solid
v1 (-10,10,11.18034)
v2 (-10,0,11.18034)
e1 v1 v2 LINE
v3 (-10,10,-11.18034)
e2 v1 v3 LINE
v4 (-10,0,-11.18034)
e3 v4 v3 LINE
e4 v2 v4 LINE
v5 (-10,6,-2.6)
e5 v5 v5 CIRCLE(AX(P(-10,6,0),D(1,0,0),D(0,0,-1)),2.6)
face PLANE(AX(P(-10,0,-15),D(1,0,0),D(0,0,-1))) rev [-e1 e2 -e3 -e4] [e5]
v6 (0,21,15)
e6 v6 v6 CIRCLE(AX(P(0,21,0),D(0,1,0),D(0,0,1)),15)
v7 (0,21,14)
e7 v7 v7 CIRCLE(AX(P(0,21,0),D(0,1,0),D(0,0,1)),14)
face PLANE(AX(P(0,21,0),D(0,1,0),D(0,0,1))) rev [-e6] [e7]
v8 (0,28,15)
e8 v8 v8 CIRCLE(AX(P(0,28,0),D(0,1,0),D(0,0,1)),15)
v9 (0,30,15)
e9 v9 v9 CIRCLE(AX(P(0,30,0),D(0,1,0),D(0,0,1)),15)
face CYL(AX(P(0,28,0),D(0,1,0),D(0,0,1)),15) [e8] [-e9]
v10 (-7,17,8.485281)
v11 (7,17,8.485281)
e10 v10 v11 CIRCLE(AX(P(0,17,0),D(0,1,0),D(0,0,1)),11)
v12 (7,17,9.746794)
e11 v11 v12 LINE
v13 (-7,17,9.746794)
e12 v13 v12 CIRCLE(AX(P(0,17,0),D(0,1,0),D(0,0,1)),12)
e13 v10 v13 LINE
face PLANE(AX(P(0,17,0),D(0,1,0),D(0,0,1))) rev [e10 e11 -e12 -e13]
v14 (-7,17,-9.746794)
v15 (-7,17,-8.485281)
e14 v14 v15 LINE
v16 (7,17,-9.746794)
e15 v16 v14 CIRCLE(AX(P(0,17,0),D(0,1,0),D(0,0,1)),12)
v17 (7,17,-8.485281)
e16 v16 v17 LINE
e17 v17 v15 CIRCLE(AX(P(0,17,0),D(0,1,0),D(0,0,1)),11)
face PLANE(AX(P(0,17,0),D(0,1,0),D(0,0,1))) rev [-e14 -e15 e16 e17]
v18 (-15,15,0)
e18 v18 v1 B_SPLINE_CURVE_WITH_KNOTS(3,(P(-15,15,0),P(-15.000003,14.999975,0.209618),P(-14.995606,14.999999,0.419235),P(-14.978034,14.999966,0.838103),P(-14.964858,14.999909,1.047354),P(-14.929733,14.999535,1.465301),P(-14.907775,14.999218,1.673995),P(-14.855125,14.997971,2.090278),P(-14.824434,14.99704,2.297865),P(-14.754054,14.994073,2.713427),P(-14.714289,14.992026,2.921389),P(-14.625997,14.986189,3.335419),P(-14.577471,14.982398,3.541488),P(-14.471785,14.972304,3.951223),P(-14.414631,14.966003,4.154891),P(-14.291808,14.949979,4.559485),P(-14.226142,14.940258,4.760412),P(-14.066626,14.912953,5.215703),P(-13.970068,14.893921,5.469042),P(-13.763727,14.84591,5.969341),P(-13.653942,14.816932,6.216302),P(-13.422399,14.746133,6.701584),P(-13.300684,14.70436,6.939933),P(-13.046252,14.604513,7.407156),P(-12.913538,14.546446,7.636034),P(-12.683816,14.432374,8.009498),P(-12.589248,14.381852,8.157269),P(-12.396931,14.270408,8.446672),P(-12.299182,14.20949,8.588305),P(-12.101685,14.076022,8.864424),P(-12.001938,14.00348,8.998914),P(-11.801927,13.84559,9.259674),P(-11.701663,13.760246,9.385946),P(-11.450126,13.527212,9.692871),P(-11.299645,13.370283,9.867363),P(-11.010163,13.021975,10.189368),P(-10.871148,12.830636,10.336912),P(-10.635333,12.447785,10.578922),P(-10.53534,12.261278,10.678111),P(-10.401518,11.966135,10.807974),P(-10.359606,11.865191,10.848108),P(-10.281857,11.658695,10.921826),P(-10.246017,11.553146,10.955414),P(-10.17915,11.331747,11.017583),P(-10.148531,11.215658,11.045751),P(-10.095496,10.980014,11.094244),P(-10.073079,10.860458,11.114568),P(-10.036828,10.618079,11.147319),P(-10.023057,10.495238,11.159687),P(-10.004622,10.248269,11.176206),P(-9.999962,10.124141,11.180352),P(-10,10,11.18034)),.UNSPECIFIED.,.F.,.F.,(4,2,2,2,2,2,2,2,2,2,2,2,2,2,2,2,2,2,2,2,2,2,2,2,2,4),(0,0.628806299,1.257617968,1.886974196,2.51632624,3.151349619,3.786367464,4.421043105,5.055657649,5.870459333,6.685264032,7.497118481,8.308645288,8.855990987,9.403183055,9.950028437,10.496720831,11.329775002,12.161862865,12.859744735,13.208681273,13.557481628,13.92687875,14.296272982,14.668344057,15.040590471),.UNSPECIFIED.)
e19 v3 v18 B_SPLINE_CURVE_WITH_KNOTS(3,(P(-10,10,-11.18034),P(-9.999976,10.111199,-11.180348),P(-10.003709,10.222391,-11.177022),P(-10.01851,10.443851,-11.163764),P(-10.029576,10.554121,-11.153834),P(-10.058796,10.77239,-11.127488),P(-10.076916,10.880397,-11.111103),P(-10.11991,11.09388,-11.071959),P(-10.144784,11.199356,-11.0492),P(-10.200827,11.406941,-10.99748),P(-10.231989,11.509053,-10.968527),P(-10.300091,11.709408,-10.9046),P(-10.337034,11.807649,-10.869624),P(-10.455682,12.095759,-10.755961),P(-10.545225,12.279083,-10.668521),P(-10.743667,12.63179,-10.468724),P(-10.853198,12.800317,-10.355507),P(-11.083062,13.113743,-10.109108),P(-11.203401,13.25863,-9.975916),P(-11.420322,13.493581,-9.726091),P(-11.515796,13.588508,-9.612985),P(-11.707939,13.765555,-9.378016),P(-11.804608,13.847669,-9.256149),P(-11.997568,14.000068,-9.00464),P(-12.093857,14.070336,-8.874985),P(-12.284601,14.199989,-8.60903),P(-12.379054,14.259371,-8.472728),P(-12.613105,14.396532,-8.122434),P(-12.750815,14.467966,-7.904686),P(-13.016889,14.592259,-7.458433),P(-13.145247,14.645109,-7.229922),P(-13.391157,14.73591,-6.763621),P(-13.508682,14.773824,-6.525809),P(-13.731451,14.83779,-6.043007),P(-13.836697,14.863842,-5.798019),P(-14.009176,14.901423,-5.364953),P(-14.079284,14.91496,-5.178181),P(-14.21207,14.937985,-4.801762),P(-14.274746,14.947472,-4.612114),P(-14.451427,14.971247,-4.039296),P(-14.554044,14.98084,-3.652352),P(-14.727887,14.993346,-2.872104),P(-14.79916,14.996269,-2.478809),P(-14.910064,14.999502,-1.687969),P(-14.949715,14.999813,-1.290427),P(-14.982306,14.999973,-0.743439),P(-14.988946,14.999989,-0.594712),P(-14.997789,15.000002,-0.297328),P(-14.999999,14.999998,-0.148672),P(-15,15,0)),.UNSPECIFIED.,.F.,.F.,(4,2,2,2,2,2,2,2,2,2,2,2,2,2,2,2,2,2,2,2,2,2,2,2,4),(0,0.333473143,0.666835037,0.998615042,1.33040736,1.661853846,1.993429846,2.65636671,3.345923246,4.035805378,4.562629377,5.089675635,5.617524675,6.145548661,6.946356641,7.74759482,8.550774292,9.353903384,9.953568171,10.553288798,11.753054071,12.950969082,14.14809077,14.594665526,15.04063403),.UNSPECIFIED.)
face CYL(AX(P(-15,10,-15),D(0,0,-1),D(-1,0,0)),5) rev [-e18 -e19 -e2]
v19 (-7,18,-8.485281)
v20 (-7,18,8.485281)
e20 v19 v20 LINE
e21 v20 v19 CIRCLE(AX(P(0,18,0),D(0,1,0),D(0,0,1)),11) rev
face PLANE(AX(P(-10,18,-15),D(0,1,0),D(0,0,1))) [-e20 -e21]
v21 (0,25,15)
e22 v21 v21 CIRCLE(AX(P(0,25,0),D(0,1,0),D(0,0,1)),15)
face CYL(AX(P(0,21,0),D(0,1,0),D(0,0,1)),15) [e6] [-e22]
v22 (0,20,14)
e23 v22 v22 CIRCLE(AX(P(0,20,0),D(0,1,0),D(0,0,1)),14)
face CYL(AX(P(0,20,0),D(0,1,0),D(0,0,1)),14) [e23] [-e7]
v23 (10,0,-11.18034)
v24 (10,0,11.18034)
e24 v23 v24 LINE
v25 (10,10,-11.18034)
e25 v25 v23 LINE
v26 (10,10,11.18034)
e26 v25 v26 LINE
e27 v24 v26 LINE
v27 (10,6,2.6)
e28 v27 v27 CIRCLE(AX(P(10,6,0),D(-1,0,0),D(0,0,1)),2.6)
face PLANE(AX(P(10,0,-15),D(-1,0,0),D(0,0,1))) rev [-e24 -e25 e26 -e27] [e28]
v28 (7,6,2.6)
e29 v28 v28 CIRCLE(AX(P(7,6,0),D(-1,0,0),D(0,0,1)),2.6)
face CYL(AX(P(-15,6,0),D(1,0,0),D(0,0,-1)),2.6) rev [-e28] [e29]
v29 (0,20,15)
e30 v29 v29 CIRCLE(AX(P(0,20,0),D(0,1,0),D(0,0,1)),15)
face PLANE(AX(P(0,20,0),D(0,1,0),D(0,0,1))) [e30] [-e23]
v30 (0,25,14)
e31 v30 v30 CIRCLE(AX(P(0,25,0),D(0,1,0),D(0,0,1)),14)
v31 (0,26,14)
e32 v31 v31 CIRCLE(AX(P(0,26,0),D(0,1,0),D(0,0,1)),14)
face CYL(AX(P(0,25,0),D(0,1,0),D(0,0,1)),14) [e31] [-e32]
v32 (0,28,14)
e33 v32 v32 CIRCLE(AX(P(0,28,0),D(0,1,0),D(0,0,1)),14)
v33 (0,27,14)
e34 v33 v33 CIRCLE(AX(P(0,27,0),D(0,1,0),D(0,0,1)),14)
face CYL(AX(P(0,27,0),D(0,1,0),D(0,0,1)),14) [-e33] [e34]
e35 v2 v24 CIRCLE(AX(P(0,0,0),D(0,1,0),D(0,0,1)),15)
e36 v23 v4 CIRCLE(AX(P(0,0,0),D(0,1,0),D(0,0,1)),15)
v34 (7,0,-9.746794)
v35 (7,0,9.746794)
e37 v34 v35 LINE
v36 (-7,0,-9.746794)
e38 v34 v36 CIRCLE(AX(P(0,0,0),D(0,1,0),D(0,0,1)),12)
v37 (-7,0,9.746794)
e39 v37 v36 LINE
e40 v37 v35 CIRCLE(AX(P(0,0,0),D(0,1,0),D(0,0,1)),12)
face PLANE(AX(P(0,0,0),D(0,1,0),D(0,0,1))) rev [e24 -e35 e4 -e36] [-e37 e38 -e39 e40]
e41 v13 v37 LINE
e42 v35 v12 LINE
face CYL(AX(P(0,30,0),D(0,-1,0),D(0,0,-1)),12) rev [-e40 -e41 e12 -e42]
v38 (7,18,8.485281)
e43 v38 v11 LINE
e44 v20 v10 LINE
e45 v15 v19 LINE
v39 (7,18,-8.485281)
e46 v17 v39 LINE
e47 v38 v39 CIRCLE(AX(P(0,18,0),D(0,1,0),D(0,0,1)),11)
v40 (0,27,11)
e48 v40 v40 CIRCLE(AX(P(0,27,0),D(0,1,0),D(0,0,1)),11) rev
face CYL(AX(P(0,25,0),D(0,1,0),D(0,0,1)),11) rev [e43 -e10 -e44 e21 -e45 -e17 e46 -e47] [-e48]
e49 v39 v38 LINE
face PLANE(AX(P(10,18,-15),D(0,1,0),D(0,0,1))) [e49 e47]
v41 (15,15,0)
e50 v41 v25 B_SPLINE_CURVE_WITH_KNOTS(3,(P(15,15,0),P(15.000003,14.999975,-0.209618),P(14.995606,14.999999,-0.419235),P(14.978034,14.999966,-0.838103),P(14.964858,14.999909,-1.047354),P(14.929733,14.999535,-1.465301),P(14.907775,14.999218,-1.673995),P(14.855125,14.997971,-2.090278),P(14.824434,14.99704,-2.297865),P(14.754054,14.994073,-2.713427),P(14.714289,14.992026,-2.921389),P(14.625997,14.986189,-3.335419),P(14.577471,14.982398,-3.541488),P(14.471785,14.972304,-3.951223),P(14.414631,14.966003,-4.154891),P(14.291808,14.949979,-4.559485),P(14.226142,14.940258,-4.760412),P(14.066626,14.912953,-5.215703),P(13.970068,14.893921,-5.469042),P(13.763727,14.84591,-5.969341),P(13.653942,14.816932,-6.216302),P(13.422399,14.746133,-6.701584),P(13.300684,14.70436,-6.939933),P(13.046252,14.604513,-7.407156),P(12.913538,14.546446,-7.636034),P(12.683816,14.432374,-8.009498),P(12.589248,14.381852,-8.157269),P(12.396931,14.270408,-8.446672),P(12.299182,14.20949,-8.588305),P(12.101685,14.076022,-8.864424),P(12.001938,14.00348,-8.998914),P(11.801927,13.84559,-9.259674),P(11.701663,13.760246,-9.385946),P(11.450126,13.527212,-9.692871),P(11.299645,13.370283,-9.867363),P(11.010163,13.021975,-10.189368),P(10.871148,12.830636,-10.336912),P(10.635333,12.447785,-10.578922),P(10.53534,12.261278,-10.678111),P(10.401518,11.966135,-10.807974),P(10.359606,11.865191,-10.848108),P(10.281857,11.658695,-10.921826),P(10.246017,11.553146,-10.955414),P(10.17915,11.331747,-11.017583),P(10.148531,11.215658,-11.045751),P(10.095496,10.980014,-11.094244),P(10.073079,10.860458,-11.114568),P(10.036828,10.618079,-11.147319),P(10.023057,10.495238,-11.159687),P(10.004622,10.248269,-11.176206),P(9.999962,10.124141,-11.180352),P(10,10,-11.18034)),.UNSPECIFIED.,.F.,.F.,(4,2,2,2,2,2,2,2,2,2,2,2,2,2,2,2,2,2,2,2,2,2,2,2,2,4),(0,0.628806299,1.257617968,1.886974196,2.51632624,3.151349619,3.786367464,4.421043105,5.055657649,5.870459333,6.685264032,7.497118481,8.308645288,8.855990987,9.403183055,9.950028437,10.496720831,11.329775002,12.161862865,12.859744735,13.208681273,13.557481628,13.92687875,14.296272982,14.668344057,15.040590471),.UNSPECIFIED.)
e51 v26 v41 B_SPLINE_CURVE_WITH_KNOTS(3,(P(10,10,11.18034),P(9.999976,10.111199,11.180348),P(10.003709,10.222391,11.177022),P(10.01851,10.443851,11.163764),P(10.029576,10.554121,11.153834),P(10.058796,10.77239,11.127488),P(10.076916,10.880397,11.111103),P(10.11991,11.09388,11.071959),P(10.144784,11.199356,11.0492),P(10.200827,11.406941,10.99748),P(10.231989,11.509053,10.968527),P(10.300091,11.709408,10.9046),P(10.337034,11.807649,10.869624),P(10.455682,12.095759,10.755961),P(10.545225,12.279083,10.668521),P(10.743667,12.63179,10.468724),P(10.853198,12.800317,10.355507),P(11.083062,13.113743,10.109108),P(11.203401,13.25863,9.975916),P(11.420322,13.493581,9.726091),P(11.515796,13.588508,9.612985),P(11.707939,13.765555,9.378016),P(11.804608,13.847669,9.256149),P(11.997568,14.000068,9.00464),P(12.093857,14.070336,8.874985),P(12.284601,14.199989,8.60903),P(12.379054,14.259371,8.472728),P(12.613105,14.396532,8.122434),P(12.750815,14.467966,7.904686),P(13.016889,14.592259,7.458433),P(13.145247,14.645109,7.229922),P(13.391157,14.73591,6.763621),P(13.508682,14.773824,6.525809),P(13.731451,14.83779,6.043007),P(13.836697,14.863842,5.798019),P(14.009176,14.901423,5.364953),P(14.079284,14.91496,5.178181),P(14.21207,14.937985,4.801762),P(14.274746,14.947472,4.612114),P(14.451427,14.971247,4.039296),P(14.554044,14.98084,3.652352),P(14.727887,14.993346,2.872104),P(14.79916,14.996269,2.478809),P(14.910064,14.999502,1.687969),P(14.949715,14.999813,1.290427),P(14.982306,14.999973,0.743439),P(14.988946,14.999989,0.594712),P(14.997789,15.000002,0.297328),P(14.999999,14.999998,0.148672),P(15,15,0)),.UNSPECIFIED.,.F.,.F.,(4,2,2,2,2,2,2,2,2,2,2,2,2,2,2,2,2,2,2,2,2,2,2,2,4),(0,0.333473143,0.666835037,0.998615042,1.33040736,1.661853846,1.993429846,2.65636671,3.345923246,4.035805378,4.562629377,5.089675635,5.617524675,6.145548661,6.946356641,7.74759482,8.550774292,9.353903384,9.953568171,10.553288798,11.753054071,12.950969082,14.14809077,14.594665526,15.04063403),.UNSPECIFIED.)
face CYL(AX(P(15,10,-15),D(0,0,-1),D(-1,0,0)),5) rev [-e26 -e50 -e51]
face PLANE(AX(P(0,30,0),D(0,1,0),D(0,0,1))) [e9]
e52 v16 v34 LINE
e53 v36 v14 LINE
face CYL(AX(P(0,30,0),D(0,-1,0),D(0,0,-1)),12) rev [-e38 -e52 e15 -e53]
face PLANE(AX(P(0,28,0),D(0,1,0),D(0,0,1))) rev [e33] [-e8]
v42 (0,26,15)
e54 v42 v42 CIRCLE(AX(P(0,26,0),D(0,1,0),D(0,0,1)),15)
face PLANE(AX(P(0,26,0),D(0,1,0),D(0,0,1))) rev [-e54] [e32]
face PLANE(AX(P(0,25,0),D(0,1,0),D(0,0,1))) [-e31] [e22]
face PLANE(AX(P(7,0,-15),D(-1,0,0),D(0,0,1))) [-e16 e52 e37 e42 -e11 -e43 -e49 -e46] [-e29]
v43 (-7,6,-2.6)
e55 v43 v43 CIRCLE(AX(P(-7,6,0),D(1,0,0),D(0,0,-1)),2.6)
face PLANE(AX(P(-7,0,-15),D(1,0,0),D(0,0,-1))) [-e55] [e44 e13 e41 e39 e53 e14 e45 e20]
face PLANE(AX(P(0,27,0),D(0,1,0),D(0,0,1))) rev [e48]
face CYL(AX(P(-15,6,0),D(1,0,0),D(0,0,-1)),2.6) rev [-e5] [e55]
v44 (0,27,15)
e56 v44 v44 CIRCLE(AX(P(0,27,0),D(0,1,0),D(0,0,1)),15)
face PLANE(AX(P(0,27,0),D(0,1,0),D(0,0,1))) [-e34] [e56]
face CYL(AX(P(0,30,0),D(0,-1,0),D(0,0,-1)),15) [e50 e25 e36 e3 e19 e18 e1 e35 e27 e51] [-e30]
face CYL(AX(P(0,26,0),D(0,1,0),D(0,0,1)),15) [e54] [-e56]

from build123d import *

# Parameters (mm, degrees)
SKETCH1_R               = 15
BOSS_EXTRUDE1_DEPTH     = 30
CUT_EXTRUDE3_DEPTH      = 37.742346142
CUT_EXTRUDE3_DEPTH_BACK = 37.742346142
SKETCH5_W               = 5
SKETCH5_H               = 15
CUT_EXTRUDE5_START      = -10
SKETCH6_R               = 15
CUT_EXTRUDE5_DEPTH      = 10
SKETCH6_4_R             = 14
BOSS_EXTRUDE2_DEPTH     = 10
SKETCH6_5_R             = 15
SKETCH6_5_R_2           = 14
BOSS_EXTRUDE3_DEPTH     = 9
SKETCH6_6_R             = 15
SKETCH6_6_R_2           = 14
CUT_EXTRUDE6_DEPTH      = 5
SKETCH6_7_R             = 15
SKETCH6_7_R_2           = 14
BOSS_EXTRUDE4_DEPTH     = 4
SKETCH6_8_R             = 15
SKETCH6_8_R_2           = 14
CUT_EXTRUDE7_DEPTH      = 3
SKETCH6_9_R             = 15
SKETCH6_9_R_2           = 14
BOSS_EXTRUDE5_DEPTH     = 2
SHELL2_DEPTH            = 27
SHELL2_START            = 18
SHELL2_2_DEPTH          = 9
SHELL2_3_DEPTH          = 17
CUT_EXTRUDE2_DEPTH      = 37.742346142
CUT_EXTRUDE2_DEPTH_BACK = 37.742346142
SKETCH4_R               = 2.6
FILLET1_R               = 5


# Read off the part's stored shape, not the designer's step: Shell2
with BuildPart() as part:
    # Sketch1 → Boss-Extrude1 (new body)
    with BuildSketch(Plane(origin=(0, 0, 0), x_dir=(1, 0, 0), z_dir=(0, 1, 0))):
        with Locations(Location((0, 0, 0), (0, 0, 270))):
            Circle(SKETCH1_R)
    extrude(amount=BOSS_EXTRUDE1_DEPTH)

    # Sketch5 → Cut-Extrude3 (cut, two sides: drawn at the far end of the back side and taken through both)
    with BuildSketch(Plane.XY.offset(-CUT_EXTRUDE3_DEPTH_BACK)):
        with Locations((-12.5, 7.5)):
            Rectangle(SKETCH5_W, SKETCH5_H)
        with Locations((12.5, 7.5)):
            Rectangle(SKETCH5_W, SKETCH5_H)
    extrude(amount=CUT_EXTRUDE3_DEPTH + CUT_EXTRUDE3_DEPTH_BACK, mode=Mode.SUBTRACT)

    # Sketch6 → Cut-Extrude5 (cut)
    with BuildSketch(Plane(origin=(0, 30, 0), x_dir=(1, 0, 0), z_dir=(0, 1, 0)).offset(CUT_EXTRUDE5_START)):
        with Locations(Location((0, 0, 0), (0, 0, 48.189685104))):
            Circle(SKETCH6_R)
    extrude(amount=CUT_EXTRUDE5_DEPTH, mode=Mode.SUBTRACT)

    # Sketch6<4> → Boss-Extrude2 (add)
    with BuildSketch(Plane(origin=(0, 30, 0), x_dir=(1, 0, 0), z_dir=(0, 1, 0))):
        with Locations(Location((0, 0, 0), (0, 0, 270))):
            Circle(SKETCH6_4_R)
    extrude(amount=-BOSS_EXTRUDE2_DEPTH)

    # Sketch6<5> → Boss-Extrude3 (add)
    with BuildSketch(Plane(origin=(0, 30, 0), x_dir=(1, 0, 0), z_dir=(0, 1, 0))):
        with Locations(Location((0, 0, 0), (0, 0, 48.189685104))):
            Circle(SKETCH6_5_R)
        with Locations(Location((0, 0, 0), (0, 0, 270))):
            Circle(SKETCH6_5_R_2, mode=Mode.SUBTRACT)
    extrude(amount=-BOSS_EXTRUDE3_DEPTH)

    # Sketch6<6> → Cut-Extrude6 (cut)
    with BuildSketch(Plane(origin=(0, 30, 0), x_dir=(1, 0, 0), z_dir=(0, 1, 0))):
        with Locations(Location((0, 0, 0), (0, 0, 270))):
            Circle(SKETCH6_6_R)
        with Locations(Location((0, 0, 0), (0, 0, 270))):
            Circle(SKETCH6_6_R_2, mode=Mode.SUBTRACT)
    extrude(amount=-CUT_EXTRUDE6_DEPTH, mode=Mode.SUBTRACT)

    # Sketch6<7> → Boss-Extrude4 (add)
    with BuildSketch(Plane(origin=(0, 30, 0), x_dir=(1, 0, 0), z_dir=(0, 1, 0))):
        with Locations(Location((0, 0, 0), (0, 0, 270))):
            Circle(SKETCH6_7_R)
        with Locations(Location((0, 0, 0), (0, 0, 270))):
            Circle(SKETCH6_7_R_2, mode=Mode.SUBTRACT)
    extrude(amount=-BOSS_EXTRUDE4_DEPTH)

    # Sketch6<8> → Cut-Extrude7 (cut)
    with BuildSketch(Plane(origin=(0, 30, 0), x_dir=(1, 0, 0), z_dir=(0, 1, 0))):
        with Locations(Location((0, 0, 0), (0, 0, 270))):
            Circle(SKETCH6_8_R)
        with Locations(Location((0, 0, 0), (0, 0, 270))):
            Circle(SKETCH6_8_R_2, mode=Mode.SUBTRACT)
    extrude(amount=-CUT_EXTRUDE7_DEPTH, mode=Mode.SUBTRACT)

    # Sketch6<9> → Boss-Extrude5 (add)
    with BuildSketch(Plane(origin=(0, 30, 0), x_dir=(1, 0, 0), z_dir=(0, 1, 0))):
        with Locations(Location((0, 0, 0), (0, 0, 270))):
            Circle(SKETCH6_9_R)
        with Locations(Location((0, 0, 0), (0, 0, 270))):
            Circle(SKETCH6_9_R_2, mode=Mode.SUBTRACT)
    extrude(amount=-BOSS_EXTRUDE5_DEPTH)

    # Shell2 outline → Shell2 (cut)
    with BuildSketch(Plane(origin=(0, 0, 0), x_dir=(1, 0, 0), z_dir=(0, 1, 0))):
        with BuildLine():
            Line((7, -8.485281374), (7, 8.485281374))
            ThreePointArc((7, 8.485281374), (0, 11), (-7, 8.485281374))
            Line((-7, 8.485281374), (-7, -8.485281374))
            ThreePointArc((-7, -8.485281374), (0, -11), (7, -8.485281374))
        make_face()
    extrude(amount=SHELL2_DEPTH, mode=Mode.SUBTRACT)

    # Shell2 2 outline → Shell2 2 (cut)
    with BuildSketch(Plane(origin=(0, 0, 0), x_dir=(1, 0, 0), z_dir=(0, 1, 0)).offset(SHELL2_START)):
        with BuildLine():
            ThreePointArc((7, -8.485281374), (11, 0), (7, 8.485281374))
            Line((7, 8.485281374), (7, -8.485281374))
        make_face()
        with BuildLine():
            Line((-7, -8.485281374), (-7, 8.485281374))
            ThreePointArc((-7, 8.485281374), (-11, 0), (-7, -8.485281374))
        make_face()
    extrude(amount=SHELL2_2_DEPTH, mode=Mode.SUBTRACT)

    # Shell2 3 outline → Shell2 3 (cut)
    with BuildSketch(Plane(origin=(0, 0, 0), x_dir=(1, 0, 0), z_dir=(0, 1, 0))):
        with BuildLine():
            ThreePointArc((-7, 8.485281374), (0, 11), (7, 8.485281374))
            Line((7, 8.485281374), (7, 9.746794345))
            ThreePointArc((7, 9.746794345), (0, 12), (-7, 9.746794345))
            Line((-7, 9.746794345), (-7, 8.485281374))
        make_face()
        with BuildLine():
            Line((7, -9.746794345), (7, -8.485281374))
            ThreePointArc((7, -8.485281374), (0, -11), (-7, -8.485281374))
            Line((-7, -8.485281374), (-7, -9.746794345))
            ThreePointArc((-7, -9.746794345), (0, -12), (7, -9.746794345))
        make_face()
    extrude(amount=SHELL2_3_DEPTH, mode=Mode.SUBTRACT)

    # Sketch4 → Cut-Extrude2 (cut, two sides: drawn at the far end of the back side and taken through both)
    with BuildSketch(Plane(origin=(0, 0, 0), x_dir=(0, 0, -1), z_dir=(1, 0, 0)).offset(-CUT_EXTRUDE2_DEPTH_BACK)):
        with Locations(Location((0, 6, 0), (0, 0, 180))):
            Circle(SKETCH4_R)
    extrude(amount=CUT_EXTRUDE2_DEPTH + CUT_EXTRUDE2_DEPTH_BACK, mode=Mode.SUBTRACT)

    # Fillet1
    fillet1_edges = [part.edges().sort_by_distance(p)[0] for p in [
        (10, 15, 0),
        (-10, 15, 0),
    ]]
    fillet(fillet1_edges, radius=FILLET1_R - 0.0001)  # a hair under: the kernel refuses the full size


solid = part.part
